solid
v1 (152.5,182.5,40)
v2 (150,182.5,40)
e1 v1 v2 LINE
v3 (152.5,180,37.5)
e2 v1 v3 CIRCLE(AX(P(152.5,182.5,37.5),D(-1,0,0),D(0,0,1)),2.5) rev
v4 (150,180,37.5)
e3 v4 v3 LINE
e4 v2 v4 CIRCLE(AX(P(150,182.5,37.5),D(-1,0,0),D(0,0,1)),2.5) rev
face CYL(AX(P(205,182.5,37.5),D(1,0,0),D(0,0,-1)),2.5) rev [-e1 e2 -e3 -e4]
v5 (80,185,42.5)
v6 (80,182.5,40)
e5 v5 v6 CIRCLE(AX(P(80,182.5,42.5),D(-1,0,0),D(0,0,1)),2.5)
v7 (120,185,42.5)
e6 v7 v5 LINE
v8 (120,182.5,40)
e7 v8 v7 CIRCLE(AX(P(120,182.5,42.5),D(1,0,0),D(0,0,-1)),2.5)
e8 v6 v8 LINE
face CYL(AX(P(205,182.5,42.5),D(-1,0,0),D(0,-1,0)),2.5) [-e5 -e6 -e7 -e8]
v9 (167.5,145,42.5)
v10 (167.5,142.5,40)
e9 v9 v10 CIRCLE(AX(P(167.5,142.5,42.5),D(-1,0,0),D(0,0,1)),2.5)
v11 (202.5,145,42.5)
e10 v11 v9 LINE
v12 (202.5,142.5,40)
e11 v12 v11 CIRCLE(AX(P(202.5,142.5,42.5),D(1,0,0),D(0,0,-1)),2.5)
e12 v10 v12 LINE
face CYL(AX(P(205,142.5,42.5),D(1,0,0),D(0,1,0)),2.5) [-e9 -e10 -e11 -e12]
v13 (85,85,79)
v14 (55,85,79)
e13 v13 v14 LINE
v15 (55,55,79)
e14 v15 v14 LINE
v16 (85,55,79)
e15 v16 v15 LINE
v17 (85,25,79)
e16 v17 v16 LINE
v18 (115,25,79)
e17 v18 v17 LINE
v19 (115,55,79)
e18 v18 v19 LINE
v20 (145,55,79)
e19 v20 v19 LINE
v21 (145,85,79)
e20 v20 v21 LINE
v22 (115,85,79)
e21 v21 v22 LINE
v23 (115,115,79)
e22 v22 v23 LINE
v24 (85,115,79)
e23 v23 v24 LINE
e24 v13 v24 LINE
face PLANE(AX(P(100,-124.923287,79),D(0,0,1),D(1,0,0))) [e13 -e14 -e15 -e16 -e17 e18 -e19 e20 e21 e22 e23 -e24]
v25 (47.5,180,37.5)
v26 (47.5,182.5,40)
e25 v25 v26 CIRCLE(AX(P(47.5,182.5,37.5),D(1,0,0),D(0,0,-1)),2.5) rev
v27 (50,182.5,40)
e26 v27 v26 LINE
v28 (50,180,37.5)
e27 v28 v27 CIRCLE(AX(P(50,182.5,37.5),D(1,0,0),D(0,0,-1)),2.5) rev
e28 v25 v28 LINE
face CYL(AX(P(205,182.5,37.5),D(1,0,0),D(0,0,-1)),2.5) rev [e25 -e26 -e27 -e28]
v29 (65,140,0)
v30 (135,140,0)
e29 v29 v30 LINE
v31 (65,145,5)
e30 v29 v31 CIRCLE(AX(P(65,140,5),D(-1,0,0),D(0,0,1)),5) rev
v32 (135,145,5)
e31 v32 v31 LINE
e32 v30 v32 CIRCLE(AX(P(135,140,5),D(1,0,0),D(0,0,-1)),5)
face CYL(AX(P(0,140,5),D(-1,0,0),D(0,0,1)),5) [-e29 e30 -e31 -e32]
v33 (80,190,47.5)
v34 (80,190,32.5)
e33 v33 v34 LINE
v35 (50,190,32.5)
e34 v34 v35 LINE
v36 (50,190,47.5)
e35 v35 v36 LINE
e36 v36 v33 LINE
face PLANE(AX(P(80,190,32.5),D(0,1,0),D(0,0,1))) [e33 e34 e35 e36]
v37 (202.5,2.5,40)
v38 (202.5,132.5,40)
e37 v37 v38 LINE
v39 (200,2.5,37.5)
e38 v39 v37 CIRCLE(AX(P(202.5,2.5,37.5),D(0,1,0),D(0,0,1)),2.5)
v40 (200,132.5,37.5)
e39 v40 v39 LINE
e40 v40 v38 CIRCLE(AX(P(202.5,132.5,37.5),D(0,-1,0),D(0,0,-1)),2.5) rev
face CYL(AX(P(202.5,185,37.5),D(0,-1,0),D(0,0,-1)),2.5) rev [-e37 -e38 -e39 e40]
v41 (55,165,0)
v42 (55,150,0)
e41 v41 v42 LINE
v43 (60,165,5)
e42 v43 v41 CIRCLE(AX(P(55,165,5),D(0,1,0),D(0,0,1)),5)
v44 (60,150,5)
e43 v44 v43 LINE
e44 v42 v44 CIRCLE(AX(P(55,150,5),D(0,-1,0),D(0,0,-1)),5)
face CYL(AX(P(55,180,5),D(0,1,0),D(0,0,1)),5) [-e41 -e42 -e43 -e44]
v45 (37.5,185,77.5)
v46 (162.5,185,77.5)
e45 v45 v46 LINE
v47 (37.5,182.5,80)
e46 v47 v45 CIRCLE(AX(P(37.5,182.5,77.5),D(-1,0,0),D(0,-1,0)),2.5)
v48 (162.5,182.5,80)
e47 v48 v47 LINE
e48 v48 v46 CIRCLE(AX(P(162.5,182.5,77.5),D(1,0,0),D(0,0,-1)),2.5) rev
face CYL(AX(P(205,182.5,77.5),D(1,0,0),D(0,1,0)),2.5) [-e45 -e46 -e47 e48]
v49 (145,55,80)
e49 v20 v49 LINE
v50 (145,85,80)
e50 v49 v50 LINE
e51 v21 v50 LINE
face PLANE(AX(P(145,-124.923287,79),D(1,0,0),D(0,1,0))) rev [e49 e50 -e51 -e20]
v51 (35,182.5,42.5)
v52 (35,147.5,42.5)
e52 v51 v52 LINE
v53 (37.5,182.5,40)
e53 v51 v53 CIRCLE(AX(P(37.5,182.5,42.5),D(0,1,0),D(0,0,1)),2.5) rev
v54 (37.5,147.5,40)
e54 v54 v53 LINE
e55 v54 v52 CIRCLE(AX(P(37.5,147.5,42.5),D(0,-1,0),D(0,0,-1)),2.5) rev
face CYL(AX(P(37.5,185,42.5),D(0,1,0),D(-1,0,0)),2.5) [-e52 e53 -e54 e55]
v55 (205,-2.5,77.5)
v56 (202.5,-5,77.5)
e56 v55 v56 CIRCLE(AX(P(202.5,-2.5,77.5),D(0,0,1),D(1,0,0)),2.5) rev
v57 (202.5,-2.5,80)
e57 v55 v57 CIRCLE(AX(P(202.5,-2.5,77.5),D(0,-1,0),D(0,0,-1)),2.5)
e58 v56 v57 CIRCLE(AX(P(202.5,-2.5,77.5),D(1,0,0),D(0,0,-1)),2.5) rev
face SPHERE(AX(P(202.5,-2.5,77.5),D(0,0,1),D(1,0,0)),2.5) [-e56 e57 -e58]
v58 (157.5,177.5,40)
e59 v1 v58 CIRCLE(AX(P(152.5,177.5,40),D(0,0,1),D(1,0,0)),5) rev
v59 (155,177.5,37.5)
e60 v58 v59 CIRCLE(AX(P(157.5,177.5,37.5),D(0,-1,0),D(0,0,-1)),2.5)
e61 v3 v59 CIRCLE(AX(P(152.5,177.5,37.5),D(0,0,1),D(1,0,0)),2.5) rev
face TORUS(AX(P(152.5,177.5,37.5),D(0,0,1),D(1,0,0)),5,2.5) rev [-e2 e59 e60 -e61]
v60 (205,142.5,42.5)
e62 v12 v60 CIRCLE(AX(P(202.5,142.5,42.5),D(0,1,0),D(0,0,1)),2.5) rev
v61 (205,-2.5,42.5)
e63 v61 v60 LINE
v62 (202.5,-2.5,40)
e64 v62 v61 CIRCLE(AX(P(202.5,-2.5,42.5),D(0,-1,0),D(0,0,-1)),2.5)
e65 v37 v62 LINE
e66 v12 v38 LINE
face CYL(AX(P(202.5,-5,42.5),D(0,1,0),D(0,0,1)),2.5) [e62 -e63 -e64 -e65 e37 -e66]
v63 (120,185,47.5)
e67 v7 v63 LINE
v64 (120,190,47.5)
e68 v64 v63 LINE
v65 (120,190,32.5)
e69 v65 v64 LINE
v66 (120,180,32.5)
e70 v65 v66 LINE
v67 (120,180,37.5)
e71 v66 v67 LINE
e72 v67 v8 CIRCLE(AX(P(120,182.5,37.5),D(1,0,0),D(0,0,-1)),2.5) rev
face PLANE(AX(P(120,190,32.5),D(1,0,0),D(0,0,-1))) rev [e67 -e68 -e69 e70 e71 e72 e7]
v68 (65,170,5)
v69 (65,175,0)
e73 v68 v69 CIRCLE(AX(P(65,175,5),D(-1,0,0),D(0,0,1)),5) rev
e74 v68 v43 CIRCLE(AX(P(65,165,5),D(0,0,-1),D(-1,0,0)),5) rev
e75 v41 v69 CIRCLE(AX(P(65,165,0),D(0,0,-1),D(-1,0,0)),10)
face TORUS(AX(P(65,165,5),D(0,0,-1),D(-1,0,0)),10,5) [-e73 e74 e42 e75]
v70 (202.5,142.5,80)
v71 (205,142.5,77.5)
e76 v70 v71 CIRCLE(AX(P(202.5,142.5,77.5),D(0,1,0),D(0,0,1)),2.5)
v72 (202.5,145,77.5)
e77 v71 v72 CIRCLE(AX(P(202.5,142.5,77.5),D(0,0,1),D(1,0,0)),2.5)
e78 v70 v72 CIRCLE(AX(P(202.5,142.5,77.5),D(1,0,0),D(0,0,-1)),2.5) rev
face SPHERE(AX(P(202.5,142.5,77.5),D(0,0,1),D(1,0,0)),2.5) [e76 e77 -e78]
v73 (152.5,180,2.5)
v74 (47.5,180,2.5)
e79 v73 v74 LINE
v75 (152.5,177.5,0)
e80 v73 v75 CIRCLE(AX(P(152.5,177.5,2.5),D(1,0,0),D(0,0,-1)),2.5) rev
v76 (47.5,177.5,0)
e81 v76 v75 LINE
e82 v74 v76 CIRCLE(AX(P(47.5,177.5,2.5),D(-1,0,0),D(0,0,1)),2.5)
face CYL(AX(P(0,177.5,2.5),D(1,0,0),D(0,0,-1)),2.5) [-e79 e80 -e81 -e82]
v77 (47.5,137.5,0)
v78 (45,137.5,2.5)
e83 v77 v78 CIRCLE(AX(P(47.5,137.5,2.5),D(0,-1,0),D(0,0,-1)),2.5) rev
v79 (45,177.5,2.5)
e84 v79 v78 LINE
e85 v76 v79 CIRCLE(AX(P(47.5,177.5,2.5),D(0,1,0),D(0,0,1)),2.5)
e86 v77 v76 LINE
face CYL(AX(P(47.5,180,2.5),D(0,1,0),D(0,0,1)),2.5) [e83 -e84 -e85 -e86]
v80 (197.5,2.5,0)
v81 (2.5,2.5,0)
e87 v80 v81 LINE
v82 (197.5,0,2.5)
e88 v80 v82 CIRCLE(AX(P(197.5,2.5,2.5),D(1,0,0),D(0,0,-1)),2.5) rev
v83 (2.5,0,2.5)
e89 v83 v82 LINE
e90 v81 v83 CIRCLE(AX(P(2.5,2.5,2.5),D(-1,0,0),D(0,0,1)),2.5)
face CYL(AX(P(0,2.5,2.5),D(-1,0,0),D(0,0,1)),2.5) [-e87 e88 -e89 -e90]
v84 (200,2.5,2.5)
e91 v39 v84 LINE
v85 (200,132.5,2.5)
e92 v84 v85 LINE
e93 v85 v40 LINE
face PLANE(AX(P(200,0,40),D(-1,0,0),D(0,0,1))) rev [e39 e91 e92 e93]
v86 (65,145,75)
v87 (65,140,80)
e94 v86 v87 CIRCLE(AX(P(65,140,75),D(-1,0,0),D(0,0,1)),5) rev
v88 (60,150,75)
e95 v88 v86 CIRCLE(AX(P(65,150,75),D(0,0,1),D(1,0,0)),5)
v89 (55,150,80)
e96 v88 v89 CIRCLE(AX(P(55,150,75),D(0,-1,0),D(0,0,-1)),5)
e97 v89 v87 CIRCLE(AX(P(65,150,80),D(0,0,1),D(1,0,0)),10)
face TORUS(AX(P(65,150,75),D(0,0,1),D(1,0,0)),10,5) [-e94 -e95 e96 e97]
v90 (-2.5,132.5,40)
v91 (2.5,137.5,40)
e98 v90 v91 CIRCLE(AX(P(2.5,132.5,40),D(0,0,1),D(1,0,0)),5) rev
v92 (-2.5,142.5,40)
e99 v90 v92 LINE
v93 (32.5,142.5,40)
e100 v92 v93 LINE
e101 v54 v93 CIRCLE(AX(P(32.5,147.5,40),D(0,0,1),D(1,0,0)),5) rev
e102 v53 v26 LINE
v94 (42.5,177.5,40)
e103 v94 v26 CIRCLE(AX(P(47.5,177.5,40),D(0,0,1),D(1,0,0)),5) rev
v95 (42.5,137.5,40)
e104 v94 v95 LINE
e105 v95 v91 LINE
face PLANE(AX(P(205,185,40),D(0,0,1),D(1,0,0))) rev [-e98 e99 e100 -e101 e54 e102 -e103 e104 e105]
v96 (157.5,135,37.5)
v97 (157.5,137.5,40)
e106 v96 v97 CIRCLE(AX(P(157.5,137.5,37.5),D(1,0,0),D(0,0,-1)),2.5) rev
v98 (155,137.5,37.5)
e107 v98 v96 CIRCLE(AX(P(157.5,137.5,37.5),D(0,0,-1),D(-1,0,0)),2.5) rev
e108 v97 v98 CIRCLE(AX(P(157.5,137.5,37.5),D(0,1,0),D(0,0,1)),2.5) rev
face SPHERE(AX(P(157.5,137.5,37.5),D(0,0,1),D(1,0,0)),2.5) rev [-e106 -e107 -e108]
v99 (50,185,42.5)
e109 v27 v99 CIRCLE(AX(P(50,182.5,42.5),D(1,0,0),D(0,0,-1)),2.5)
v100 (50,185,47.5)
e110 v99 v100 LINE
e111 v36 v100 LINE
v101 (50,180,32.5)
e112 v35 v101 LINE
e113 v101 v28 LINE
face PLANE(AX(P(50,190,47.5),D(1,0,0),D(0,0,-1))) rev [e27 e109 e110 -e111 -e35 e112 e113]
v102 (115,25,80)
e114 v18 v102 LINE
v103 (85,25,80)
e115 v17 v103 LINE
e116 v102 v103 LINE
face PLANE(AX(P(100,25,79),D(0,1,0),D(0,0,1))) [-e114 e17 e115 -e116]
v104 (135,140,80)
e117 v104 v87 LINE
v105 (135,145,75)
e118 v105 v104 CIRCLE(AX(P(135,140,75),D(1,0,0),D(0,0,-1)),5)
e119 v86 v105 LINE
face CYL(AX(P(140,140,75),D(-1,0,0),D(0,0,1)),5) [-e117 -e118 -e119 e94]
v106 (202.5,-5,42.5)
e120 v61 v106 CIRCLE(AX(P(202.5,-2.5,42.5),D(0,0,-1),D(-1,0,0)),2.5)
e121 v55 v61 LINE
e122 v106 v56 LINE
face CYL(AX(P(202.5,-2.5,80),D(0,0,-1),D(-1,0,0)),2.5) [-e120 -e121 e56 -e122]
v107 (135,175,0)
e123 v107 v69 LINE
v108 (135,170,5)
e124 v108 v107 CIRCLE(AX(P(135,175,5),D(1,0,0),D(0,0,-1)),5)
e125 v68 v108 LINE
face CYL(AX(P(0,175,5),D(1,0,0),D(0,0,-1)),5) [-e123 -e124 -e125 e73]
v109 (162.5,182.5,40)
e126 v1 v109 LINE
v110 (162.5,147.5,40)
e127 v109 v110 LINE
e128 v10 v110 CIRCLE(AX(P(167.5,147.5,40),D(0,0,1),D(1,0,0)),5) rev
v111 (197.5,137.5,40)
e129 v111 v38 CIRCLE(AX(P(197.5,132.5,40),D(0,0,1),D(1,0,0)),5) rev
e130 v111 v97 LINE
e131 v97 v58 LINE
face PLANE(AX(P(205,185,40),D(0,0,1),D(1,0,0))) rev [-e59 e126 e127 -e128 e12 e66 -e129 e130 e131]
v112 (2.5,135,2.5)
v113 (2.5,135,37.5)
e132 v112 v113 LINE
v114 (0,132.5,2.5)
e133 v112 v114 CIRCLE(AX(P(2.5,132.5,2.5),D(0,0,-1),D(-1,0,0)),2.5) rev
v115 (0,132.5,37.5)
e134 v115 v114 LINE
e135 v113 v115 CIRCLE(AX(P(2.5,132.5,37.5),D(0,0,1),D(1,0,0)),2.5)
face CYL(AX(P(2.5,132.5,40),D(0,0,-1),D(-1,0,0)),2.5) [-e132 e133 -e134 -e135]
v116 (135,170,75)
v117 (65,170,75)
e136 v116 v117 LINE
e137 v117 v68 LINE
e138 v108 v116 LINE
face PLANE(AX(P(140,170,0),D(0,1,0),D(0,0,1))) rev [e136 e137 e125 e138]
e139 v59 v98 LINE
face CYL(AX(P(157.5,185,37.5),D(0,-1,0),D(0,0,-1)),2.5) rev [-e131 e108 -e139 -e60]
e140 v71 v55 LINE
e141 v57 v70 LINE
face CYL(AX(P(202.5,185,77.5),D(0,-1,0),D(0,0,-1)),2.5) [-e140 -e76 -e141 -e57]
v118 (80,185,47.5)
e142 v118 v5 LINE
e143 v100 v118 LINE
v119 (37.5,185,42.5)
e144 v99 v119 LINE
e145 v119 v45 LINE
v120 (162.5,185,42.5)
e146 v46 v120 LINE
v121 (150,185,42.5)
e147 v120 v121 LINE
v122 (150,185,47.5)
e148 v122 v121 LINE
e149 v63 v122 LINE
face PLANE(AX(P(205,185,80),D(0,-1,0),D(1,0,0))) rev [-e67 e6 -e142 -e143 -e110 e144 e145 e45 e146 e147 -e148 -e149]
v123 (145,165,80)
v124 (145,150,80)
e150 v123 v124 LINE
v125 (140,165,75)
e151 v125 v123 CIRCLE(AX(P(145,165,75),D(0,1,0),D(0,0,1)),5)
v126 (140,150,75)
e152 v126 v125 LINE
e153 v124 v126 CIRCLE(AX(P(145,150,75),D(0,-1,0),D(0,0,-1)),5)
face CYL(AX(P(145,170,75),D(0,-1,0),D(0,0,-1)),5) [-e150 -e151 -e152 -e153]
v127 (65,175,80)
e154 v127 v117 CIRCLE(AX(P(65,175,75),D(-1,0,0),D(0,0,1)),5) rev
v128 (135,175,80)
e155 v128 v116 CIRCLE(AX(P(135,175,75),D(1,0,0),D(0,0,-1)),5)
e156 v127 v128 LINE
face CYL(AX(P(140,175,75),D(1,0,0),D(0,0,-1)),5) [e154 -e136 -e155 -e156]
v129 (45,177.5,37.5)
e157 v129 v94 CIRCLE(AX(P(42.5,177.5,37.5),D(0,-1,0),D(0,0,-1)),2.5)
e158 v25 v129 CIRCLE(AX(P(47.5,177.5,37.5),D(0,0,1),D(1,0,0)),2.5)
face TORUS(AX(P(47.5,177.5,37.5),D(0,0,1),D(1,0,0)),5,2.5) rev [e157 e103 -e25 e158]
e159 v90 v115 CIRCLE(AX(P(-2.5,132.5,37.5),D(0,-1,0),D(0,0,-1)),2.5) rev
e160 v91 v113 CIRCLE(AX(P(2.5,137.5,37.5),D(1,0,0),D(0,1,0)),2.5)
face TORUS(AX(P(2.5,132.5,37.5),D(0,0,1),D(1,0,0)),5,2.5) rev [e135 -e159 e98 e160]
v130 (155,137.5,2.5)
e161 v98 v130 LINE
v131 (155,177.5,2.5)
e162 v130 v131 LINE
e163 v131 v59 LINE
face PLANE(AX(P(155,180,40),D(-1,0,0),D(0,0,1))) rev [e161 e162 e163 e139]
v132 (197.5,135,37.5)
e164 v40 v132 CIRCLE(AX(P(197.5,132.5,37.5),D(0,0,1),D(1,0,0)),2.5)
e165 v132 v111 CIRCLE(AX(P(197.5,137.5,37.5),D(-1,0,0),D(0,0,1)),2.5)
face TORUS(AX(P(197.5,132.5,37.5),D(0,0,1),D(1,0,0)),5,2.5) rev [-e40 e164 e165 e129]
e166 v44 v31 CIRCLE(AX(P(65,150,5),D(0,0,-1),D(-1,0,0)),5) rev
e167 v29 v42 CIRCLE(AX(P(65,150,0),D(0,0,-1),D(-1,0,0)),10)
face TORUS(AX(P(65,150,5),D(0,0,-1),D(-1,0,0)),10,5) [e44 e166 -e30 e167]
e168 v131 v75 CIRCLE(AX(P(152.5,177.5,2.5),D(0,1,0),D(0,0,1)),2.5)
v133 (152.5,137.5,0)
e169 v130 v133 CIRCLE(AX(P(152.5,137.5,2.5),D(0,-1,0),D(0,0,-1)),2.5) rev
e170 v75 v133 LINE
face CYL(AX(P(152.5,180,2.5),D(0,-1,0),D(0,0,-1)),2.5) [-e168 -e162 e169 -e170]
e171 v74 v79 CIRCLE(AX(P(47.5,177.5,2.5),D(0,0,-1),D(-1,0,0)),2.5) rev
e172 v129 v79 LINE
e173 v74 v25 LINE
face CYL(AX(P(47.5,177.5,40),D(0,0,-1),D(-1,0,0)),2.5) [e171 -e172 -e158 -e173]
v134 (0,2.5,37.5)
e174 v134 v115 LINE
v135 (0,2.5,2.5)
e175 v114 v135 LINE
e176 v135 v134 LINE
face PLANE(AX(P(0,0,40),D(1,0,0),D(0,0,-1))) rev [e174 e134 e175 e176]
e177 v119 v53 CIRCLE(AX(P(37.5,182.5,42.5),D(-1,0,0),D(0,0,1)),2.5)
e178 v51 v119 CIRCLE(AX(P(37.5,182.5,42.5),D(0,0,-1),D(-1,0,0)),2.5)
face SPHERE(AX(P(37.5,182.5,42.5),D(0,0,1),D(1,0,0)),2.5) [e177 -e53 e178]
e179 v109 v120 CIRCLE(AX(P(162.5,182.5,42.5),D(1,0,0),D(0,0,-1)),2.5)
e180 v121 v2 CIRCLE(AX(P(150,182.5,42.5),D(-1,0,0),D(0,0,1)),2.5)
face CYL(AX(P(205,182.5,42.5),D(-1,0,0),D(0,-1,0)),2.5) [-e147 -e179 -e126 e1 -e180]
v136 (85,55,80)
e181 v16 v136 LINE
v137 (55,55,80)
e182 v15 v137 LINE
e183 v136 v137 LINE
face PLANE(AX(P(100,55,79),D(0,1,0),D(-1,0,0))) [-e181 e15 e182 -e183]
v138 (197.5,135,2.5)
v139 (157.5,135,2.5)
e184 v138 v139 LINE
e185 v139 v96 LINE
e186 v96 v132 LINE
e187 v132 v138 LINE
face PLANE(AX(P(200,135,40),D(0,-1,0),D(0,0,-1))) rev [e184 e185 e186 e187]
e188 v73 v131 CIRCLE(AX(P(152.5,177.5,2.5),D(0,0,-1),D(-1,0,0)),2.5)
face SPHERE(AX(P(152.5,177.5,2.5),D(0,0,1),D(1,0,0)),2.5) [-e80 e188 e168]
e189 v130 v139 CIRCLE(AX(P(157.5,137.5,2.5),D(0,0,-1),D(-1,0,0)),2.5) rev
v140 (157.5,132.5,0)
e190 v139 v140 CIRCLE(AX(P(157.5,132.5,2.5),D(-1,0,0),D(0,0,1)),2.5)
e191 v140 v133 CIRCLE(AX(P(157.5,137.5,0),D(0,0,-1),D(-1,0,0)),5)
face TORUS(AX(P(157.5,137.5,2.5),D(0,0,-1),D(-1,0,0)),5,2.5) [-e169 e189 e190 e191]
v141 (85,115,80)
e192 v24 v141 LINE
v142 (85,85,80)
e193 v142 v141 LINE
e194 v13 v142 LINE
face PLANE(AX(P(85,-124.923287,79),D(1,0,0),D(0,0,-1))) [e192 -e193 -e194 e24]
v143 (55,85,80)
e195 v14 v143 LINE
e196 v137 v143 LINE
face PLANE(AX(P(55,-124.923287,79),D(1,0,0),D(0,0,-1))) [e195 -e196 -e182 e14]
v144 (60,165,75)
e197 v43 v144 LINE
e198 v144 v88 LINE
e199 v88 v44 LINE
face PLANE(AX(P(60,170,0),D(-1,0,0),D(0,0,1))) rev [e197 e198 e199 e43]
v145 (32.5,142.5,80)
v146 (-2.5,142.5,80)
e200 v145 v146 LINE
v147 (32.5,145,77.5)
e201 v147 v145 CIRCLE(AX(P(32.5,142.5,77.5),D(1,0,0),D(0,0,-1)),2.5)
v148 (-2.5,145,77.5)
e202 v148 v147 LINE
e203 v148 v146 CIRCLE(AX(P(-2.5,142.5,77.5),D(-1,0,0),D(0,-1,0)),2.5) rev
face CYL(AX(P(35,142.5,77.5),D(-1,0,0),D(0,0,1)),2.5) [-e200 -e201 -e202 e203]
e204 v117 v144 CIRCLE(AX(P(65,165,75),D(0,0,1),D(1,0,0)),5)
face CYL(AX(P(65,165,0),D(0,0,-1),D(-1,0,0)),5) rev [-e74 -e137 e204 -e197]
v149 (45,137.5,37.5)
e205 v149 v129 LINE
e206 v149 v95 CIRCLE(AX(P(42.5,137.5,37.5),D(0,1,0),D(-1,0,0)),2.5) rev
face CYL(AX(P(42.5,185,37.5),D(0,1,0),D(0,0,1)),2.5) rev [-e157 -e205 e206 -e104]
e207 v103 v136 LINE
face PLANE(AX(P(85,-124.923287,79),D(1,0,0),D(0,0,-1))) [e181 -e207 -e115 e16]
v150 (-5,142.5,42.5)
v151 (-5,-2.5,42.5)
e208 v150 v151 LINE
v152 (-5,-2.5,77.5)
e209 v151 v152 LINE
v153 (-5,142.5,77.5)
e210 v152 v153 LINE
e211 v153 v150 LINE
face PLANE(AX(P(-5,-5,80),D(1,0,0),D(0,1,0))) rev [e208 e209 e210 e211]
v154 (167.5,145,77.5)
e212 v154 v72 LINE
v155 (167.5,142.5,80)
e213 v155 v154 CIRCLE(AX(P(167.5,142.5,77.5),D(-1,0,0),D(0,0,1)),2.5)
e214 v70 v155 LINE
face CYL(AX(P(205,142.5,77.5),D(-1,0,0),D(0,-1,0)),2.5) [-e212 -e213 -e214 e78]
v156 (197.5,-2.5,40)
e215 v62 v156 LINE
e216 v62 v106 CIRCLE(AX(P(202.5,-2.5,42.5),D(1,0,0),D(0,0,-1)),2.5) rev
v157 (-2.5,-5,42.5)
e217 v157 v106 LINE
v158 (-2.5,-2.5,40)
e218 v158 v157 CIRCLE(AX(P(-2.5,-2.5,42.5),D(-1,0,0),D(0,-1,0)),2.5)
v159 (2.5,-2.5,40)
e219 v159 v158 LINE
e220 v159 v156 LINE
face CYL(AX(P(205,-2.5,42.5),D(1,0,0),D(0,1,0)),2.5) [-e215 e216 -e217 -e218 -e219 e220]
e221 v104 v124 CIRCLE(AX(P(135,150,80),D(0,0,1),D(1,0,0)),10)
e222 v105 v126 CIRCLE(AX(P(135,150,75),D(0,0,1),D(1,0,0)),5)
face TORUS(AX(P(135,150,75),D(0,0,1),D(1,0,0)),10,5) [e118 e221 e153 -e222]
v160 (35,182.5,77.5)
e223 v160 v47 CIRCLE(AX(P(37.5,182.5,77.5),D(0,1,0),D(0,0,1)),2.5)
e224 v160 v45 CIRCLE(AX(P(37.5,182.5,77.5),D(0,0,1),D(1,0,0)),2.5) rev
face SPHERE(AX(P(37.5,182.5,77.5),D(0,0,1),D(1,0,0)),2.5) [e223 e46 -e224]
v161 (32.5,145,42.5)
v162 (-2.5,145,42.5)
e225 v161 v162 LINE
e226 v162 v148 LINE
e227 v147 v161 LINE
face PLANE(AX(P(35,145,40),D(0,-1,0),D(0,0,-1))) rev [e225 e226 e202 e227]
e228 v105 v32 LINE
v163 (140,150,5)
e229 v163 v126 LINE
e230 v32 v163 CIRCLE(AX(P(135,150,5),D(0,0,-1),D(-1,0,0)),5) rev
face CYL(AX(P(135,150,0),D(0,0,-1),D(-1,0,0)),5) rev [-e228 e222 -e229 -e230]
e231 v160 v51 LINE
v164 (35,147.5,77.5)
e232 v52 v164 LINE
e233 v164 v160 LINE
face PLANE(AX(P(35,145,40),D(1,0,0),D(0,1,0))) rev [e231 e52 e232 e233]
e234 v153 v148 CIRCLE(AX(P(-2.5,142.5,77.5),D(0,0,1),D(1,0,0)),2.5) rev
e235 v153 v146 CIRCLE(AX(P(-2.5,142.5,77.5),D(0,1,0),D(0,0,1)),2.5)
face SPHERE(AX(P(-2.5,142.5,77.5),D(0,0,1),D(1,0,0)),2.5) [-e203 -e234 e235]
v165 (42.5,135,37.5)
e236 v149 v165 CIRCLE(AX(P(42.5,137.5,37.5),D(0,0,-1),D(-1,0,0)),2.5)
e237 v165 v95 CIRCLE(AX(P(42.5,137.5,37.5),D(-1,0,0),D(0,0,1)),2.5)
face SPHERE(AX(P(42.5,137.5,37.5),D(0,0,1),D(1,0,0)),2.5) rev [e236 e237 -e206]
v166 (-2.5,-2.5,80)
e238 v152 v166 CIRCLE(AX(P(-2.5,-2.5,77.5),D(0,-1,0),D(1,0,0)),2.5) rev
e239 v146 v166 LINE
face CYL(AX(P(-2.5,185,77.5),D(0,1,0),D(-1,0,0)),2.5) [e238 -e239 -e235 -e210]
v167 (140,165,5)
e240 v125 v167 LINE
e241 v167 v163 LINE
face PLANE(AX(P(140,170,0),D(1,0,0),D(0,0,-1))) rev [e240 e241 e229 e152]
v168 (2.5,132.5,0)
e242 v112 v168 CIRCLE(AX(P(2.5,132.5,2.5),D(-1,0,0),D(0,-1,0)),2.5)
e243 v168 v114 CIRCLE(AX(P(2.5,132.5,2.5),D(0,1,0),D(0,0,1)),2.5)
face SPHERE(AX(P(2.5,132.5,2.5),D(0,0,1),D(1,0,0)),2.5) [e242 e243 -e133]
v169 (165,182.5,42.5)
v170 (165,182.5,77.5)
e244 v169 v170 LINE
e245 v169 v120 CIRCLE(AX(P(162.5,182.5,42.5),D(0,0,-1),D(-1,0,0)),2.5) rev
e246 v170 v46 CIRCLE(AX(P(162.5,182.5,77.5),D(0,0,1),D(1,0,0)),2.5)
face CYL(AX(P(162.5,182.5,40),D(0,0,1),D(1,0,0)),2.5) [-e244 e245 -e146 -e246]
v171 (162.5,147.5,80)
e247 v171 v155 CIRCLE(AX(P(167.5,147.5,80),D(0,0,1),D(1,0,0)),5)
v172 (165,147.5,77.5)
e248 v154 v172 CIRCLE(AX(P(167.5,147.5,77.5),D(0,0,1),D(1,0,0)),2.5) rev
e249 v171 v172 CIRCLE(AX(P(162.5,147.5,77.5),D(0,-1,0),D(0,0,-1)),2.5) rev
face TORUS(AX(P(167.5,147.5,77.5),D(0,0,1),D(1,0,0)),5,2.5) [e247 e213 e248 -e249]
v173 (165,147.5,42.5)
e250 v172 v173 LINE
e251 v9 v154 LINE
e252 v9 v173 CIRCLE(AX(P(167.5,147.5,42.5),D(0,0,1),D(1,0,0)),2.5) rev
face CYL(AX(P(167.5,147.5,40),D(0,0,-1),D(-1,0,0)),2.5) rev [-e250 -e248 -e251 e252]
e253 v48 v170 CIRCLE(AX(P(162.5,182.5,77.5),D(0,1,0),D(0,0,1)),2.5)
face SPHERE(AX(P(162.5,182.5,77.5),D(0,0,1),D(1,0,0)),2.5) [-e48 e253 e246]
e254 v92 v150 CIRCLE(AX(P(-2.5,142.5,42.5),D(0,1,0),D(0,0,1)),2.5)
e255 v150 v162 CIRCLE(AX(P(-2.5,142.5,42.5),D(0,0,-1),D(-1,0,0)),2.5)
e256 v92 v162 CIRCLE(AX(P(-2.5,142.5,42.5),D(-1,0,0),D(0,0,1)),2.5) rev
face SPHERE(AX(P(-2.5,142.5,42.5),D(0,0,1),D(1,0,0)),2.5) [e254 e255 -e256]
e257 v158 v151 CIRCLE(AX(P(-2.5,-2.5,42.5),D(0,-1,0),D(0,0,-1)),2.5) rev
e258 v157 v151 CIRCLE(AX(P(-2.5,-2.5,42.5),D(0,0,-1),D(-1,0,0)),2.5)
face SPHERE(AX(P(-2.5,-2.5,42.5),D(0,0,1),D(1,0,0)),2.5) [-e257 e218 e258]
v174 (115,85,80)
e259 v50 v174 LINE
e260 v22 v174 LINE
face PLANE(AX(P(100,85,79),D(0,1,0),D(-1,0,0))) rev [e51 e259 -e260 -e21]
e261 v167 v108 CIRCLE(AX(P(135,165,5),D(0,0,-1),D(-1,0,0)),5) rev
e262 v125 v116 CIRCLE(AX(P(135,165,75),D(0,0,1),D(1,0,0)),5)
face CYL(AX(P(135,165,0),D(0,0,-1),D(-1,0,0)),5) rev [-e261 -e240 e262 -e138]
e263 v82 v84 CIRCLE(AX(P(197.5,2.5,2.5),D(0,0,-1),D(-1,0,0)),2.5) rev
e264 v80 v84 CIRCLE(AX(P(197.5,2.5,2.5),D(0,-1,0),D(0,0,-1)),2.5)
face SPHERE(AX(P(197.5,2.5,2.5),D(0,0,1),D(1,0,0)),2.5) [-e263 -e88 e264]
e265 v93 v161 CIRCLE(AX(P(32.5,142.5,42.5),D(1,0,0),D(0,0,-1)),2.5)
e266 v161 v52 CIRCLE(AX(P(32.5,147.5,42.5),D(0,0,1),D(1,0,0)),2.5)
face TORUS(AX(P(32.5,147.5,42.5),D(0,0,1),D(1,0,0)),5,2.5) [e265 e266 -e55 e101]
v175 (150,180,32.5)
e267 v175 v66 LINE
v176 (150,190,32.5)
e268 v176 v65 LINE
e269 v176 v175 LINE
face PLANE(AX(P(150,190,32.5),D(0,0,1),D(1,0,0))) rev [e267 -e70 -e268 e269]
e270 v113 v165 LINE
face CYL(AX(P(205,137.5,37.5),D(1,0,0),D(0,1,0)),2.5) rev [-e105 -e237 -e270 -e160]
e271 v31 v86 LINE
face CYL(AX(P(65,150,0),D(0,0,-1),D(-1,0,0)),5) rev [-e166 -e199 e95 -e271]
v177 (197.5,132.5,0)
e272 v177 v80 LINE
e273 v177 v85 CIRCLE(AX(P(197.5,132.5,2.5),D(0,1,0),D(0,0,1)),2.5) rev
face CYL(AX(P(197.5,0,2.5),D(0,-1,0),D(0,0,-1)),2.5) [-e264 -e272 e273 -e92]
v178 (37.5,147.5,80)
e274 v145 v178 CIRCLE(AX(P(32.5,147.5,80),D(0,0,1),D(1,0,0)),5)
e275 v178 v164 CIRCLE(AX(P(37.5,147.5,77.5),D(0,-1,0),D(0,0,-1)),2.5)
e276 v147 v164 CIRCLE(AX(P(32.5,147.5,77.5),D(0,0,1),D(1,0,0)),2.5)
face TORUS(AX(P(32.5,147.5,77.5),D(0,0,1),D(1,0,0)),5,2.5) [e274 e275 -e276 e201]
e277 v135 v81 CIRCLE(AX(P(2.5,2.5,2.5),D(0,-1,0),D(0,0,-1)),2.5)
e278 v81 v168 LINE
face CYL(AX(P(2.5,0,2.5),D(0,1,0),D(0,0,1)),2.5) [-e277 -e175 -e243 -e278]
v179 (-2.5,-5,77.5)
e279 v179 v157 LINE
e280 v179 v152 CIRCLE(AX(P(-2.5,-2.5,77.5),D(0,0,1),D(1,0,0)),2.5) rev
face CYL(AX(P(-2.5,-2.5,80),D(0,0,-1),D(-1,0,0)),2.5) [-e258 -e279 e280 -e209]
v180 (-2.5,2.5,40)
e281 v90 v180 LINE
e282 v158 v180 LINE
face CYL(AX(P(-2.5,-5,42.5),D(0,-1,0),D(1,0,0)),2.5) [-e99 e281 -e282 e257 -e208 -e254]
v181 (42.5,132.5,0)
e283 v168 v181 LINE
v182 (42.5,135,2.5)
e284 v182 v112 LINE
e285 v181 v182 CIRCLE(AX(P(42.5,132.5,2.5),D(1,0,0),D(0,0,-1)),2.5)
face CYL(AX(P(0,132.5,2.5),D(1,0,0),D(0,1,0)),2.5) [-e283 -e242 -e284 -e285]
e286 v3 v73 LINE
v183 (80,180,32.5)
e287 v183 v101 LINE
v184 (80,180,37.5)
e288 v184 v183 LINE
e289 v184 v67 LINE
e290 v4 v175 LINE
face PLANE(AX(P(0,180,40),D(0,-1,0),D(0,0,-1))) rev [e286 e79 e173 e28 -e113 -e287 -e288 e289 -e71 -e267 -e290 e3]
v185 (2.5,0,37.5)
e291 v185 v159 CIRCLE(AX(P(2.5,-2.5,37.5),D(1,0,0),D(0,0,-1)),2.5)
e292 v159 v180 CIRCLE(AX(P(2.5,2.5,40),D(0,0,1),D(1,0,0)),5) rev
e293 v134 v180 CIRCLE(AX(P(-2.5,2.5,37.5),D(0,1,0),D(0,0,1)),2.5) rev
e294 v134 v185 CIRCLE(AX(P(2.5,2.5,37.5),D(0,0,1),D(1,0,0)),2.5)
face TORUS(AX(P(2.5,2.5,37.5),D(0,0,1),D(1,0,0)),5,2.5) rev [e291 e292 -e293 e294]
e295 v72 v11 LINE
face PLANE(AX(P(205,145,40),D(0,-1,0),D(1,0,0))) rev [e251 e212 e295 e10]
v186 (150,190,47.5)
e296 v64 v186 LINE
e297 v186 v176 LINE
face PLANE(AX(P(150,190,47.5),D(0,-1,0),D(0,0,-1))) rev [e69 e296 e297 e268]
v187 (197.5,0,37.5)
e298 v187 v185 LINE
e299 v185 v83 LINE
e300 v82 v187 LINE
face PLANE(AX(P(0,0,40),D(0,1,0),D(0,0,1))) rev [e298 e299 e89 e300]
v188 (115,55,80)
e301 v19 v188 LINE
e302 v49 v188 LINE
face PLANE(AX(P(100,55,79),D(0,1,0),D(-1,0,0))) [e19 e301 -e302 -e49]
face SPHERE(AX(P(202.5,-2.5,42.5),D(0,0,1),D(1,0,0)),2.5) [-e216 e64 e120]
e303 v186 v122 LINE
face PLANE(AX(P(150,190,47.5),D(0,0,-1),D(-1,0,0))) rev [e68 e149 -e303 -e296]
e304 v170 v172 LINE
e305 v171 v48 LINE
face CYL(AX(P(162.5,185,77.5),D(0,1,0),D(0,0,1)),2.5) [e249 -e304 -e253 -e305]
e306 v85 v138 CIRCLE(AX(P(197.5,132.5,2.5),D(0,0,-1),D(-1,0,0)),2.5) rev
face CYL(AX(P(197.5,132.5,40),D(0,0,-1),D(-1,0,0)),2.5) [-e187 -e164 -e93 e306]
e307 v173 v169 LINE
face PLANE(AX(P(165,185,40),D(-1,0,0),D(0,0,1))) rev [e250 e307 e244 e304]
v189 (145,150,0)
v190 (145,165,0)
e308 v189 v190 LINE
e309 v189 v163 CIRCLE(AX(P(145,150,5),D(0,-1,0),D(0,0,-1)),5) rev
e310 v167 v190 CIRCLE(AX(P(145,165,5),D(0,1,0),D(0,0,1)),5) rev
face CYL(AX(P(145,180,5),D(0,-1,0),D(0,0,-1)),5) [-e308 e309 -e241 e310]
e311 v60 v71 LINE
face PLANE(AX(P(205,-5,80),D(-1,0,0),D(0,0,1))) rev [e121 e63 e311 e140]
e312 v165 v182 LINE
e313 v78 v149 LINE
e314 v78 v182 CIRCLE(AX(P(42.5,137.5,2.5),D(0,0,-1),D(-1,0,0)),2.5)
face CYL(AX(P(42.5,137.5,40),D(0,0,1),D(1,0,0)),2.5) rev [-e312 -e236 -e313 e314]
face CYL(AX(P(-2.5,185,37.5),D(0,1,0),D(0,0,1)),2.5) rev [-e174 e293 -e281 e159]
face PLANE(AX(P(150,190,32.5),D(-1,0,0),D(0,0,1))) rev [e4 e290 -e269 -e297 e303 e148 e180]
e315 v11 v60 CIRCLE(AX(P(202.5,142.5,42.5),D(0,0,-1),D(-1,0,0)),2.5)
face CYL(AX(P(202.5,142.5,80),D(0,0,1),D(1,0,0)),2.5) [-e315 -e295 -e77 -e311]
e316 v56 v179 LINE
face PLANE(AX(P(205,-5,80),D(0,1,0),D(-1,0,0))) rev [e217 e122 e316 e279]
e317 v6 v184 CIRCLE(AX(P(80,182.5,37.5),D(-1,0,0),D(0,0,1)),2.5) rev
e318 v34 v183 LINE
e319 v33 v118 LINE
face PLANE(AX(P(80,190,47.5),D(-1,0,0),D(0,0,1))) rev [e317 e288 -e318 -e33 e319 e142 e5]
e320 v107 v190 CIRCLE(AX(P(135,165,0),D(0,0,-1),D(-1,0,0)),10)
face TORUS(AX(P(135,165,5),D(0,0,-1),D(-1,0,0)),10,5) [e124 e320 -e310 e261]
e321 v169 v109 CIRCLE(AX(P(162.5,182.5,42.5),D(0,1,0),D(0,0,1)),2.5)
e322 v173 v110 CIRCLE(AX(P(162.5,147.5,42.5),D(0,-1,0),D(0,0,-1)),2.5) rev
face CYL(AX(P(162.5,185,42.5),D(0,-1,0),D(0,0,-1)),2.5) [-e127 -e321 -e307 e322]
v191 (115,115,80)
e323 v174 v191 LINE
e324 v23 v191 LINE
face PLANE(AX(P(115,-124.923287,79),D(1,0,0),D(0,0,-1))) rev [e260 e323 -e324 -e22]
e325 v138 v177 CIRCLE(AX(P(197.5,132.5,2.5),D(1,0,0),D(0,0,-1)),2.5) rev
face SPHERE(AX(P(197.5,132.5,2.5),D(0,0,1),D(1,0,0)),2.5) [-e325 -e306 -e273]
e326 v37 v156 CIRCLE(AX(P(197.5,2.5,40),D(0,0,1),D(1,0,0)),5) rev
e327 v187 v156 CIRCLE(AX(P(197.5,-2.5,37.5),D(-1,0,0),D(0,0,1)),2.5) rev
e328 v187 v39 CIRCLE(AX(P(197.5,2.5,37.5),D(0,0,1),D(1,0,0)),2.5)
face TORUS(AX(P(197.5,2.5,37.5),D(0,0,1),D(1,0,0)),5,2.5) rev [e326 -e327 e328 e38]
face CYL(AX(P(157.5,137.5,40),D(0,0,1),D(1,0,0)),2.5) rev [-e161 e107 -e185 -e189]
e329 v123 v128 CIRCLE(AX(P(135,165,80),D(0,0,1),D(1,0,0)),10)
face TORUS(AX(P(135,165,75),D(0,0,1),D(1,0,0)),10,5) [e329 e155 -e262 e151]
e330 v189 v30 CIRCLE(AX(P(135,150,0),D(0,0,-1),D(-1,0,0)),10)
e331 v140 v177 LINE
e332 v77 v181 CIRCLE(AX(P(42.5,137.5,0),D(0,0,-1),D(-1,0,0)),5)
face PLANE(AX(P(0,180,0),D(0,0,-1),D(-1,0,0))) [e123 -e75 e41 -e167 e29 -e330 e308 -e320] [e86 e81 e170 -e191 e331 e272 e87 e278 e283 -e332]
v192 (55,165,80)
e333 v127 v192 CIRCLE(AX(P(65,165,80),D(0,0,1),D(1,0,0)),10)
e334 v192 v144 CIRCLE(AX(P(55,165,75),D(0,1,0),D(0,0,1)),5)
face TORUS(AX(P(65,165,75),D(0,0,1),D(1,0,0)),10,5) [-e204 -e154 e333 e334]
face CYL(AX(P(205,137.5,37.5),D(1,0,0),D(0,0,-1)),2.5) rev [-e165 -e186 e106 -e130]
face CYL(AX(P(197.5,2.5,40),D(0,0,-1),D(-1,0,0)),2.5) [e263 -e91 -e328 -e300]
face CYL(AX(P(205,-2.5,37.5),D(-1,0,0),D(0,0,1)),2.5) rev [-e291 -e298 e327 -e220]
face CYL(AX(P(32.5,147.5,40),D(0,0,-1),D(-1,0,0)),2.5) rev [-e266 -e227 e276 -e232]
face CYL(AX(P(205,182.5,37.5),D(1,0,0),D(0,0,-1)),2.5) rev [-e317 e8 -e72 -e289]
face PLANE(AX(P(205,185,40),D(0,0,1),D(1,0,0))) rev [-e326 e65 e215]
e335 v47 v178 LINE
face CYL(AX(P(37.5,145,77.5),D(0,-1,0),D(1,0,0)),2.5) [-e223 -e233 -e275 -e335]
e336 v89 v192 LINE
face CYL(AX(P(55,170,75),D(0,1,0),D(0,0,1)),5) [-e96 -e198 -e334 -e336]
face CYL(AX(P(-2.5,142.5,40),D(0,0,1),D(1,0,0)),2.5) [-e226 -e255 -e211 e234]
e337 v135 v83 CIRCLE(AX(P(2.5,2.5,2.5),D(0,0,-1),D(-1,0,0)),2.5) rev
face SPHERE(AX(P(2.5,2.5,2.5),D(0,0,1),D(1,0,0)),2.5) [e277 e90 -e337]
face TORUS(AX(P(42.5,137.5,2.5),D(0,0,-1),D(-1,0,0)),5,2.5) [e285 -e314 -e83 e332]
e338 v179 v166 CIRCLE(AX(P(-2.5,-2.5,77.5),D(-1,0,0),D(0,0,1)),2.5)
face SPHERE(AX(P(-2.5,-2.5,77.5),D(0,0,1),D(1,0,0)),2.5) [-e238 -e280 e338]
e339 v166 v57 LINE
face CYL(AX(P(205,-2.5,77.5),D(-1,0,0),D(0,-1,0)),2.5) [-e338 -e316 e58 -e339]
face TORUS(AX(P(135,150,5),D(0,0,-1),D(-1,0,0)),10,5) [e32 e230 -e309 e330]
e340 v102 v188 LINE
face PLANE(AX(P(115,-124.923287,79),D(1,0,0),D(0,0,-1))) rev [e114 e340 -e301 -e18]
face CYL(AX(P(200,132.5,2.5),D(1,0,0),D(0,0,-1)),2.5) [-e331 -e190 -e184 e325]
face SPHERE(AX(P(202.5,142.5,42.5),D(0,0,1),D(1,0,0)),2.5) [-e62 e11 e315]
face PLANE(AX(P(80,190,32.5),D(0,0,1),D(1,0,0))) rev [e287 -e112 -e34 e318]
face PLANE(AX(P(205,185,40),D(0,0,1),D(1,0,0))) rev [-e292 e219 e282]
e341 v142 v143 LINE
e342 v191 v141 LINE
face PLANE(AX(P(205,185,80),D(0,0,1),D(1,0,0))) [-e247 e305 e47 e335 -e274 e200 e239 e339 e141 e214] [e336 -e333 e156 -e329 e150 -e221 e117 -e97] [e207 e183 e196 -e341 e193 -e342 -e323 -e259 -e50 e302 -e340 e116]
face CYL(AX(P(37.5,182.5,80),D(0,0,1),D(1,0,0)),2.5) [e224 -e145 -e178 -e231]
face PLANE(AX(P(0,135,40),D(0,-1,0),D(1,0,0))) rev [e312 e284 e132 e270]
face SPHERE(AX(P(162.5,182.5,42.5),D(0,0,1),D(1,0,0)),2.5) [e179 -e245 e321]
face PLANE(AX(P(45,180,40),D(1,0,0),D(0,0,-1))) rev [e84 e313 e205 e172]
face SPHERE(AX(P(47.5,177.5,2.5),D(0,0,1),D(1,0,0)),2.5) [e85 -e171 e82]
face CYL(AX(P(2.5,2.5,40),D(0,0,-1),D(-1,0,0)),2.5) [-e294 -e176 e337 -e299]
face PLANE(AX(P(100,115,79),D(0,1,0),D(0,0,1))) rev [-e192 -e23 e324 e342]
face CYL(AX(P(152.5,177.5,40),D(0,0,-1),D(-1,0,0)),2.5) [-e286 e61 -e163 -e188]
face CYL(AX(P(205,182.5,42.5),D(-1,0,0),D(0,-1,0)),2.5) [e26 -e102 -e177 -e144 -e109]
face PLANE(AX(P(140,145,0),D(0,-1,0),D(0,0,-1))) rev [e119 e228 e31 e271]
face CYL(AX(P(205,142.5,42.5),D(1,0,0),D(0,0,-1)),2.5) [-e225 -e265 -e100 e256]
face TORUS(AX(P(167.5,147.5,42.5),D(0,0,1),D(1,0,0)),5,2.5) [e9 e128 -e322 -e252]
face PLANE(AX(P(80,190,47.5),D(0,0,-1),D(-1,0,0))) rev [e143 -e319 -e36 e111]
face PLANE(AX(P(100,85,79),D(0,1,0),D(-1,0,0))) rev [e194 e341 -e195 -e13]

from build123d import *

# Parameters (mm, degrees)
SKETCH1_W           = 200
SKETCH1_H           = 180
BOSS_EXTRUDE1_DEPTH = 40
SKETCH2_W           = 80
SKETCH2_H           = 25
CUT_EXTRUDE1_DEPTH  = 273.029410175
SKETCH3_W           = 210
SKETCH3_H           = 190
BOSS_EXTRUDE2_DEPTH = 40
SKETCH2_2_W         = 80
SKETCH2_2_H         = 25
CUT_EXTRUDE2_DEPTH  = 280.016128566
SKETCH4_W           = 30
SKETCH4_H           = 15
BOSS_EXTRUDE3_DEPTH = 10
SKETCH5_W           = 40
SKETCH5_H           = 40
CUT_EXTRUDE3_DEPTH  = 40
SKETCH6_W           = 45
SKETCH6_H           = 45
CUT_EXTRUDE4_DEPTH  = 40
FILLET1_R           = 5
FILLET2_R           = 2.5
SKETCH7_W           = 30
SKETCH7_H           = 30
CUT_EXTRUDE5_DEPTH  = 1


with BuildPart() as part:
    # Sketch1 → Boss-Extrude1 (new body)
    with BuildSketch(Plane.XY):
        with Locations((100, 90)):
            Rectangle(SKETCH1_W, SKETCH1_H)
    extrude(amount=BOSS_EXTRUDE1_DEPTH)

    # Sketch2 → Cut-Extrude1 (cut, through all)
    with BuildSketch(Plane.XY.offset(40)):
        with Locations((100, 157.5)):
            Rectangle(SKETCH2_W, SKETCH2_H)
    extrude(amount=-CUT_EXTRUDE1_DEPTH, mode=Mode.SUBTRACT)

    # Sketch3 → Boss-Extrude2 (add)
    with BuildSketch(Plane.XY.offset(40)):
        with Locations((100, 90)):
            Rectangle(SKETCH3_W, SKETCH3_H)
    extrude(amount=BOSS_EXTRUDE2_DEPTH)

    # Sketch2<2> → Cut-Extrude2 (cut, through all)
    with BuildSketch(Plane.XY.offset(40)):
        with Locations((100, 157.5)):
            Rectangle(SKETCH2_2_W, SKETCH2_2_H)
    extrude(amount=CUT_EXTRUDE2_DEPTH, mode=Mode.SUBTRACT)

    # Sketch4 → Boss-Extrude3 (add)
    with BuildSketch(Plane(origin=(0, 180, 0), x_dir=(1, 0, 0), z_dir=(0, 1, 0))):
        with Locations((135, -40)):
            Rectangle(SKETCH4_W, SKETCH4_H)
        with Locations((65, -40)):
            Rectangle(SKETCH4_W, SKETCH4_H)
    extrude(amount=BOSS_EXTRUDE3_DEPTH)

    # Sketch5 → Cut-Extrude3 (cut)
    with BuildSketch(Plane.XY.offset(80)):
        with Locations((185, 165)):
            Rectangle(SKETCH5_W, SKETCH5_H)
        with Locations((15, 165)):
            Rectangle(SKETCH5_W, SKETCH5_H)
    extrude(amount=-CUT_EXTRUDE3_DEPTH, mode=Mode.SUBTRACT)

    # Sketch6 → Cut-Extrude4 (cut)
    with BuildSketch(Plane(origin=(0, 0, 0), x_dir=(-1, 0, 0), z_dir=(0, 0, -1))):
        with Locations((-177.5, 157.5)):
            Rectangle(SKETCH6_W, SKETCH6_H)
        with Locations((-22.5, 157.5)):
            Rectangle(SKETCH6_W, SKETCH6_H)
    extrude(amount=-CUT_EXTRUDE4_DEPTH, mode=Mode.SUBTRACT)

    # Fillet1
    fillet1_edges = [part.edges().sort_by_distance(p)[0] for p in [
        (140, 157.5, 0),
        (140, 170, 40),
        (100, 145, 0),
        (140, 145, 40),
        (60, 157.5, 0),
        (60, 145, 40),
        (100, 170, 0),
        (60, 170, 40),
        (140, 157.5, 80),
        (100, 170, 80),
        (60, 157.5, 80),
        (100, 145, 80),
    ]]
    fillet(fillet1_edges, radius=FILLET1_R)

    # Fillet2
    fillet2_edges = [part.edges().sort_by_distance(p)[0] for p in [
        (0, 0, 20),
        (200, 0, 20),
        (0, 67.5, 0),
        (100, 0, 0),
        (200, 67.5, 0),
        (100, 180, 0),
        (-5, -5, 60),
        (205, -5, 60),
        (205, 70, 80),
        (100, -5, 80),
        (-5, 70, 80),
        (100, 185, 80),
        (100, 180, 40),
        (100, 185, 40),
        (205, 145, 60),
        (185, 145, 80),
        (165, 185, 60),
        (165, 145, 60),
        (165, 165, 80),
        (35, 185, 60),
        (35, 165, 80),
        (-5, 145, 60),
        (35, 145, 60),
        (15, 145, 80),
        (200, 67.5, 40),
        (100, 0, 40),
        (0, 67.5, 40),
        (42.5, 185, 40),
        (35, 165, 40),
        (15, 145, 40),
        (-5, 70, 40),
        (100, -5, 40),
        (205, 70, 40),
        (185, 145, 40),
        (165, 165, 40),
        (157.5, 185, 40),
        (155, 157.5, 0),
        (155, 157.5, 40),
        (155, 180, 20),
        (200, 135, 20),
        (177.5, 135, 0),
        (177.5, 135, 40),
        (155, 135, 20),
        (22.5, 135, 0),
        (22.5, 135, 40),
        (0, 135, 20),
        (45, 180, 20),
        (45, 157.5, 0),
        (45, 157.5, 40),
        (45, 135, 20),
        (152.5, 180, 40),
        (47.5, 180, 40),
    ]]
    fillet(fillet2_edges, radius=FILLET2_R - 0.0001)  # a hair under: the kernel refuses the full size

    # Sketch7 → Cut-Extrude5 (cut)
    with BuildSketch(Plane.XY.offset(80)):
        with Locations((100, 70)):
            Rectangle(SKETCH7_W, SKETCH7_H)
        with Locations((130, 70)):
            Rectangle(SKETCH7_W, SKETCH7_H)
        with Locations((100, 40)):
            Rectangle(SKETCH7_W, SKETCH7_H)
        with Locations((70, 70)):
            Rectangle(SKETCH7_W, SKETCH7_H)
        with Locations((100, 100)):
            Rectangle(SKETCH7_W, SKETCH7_H)
    extrude(amount=-CUT_EXTRUDE5_DEPTH, mode=Mode.SUBTRACT)


solid = part.part
